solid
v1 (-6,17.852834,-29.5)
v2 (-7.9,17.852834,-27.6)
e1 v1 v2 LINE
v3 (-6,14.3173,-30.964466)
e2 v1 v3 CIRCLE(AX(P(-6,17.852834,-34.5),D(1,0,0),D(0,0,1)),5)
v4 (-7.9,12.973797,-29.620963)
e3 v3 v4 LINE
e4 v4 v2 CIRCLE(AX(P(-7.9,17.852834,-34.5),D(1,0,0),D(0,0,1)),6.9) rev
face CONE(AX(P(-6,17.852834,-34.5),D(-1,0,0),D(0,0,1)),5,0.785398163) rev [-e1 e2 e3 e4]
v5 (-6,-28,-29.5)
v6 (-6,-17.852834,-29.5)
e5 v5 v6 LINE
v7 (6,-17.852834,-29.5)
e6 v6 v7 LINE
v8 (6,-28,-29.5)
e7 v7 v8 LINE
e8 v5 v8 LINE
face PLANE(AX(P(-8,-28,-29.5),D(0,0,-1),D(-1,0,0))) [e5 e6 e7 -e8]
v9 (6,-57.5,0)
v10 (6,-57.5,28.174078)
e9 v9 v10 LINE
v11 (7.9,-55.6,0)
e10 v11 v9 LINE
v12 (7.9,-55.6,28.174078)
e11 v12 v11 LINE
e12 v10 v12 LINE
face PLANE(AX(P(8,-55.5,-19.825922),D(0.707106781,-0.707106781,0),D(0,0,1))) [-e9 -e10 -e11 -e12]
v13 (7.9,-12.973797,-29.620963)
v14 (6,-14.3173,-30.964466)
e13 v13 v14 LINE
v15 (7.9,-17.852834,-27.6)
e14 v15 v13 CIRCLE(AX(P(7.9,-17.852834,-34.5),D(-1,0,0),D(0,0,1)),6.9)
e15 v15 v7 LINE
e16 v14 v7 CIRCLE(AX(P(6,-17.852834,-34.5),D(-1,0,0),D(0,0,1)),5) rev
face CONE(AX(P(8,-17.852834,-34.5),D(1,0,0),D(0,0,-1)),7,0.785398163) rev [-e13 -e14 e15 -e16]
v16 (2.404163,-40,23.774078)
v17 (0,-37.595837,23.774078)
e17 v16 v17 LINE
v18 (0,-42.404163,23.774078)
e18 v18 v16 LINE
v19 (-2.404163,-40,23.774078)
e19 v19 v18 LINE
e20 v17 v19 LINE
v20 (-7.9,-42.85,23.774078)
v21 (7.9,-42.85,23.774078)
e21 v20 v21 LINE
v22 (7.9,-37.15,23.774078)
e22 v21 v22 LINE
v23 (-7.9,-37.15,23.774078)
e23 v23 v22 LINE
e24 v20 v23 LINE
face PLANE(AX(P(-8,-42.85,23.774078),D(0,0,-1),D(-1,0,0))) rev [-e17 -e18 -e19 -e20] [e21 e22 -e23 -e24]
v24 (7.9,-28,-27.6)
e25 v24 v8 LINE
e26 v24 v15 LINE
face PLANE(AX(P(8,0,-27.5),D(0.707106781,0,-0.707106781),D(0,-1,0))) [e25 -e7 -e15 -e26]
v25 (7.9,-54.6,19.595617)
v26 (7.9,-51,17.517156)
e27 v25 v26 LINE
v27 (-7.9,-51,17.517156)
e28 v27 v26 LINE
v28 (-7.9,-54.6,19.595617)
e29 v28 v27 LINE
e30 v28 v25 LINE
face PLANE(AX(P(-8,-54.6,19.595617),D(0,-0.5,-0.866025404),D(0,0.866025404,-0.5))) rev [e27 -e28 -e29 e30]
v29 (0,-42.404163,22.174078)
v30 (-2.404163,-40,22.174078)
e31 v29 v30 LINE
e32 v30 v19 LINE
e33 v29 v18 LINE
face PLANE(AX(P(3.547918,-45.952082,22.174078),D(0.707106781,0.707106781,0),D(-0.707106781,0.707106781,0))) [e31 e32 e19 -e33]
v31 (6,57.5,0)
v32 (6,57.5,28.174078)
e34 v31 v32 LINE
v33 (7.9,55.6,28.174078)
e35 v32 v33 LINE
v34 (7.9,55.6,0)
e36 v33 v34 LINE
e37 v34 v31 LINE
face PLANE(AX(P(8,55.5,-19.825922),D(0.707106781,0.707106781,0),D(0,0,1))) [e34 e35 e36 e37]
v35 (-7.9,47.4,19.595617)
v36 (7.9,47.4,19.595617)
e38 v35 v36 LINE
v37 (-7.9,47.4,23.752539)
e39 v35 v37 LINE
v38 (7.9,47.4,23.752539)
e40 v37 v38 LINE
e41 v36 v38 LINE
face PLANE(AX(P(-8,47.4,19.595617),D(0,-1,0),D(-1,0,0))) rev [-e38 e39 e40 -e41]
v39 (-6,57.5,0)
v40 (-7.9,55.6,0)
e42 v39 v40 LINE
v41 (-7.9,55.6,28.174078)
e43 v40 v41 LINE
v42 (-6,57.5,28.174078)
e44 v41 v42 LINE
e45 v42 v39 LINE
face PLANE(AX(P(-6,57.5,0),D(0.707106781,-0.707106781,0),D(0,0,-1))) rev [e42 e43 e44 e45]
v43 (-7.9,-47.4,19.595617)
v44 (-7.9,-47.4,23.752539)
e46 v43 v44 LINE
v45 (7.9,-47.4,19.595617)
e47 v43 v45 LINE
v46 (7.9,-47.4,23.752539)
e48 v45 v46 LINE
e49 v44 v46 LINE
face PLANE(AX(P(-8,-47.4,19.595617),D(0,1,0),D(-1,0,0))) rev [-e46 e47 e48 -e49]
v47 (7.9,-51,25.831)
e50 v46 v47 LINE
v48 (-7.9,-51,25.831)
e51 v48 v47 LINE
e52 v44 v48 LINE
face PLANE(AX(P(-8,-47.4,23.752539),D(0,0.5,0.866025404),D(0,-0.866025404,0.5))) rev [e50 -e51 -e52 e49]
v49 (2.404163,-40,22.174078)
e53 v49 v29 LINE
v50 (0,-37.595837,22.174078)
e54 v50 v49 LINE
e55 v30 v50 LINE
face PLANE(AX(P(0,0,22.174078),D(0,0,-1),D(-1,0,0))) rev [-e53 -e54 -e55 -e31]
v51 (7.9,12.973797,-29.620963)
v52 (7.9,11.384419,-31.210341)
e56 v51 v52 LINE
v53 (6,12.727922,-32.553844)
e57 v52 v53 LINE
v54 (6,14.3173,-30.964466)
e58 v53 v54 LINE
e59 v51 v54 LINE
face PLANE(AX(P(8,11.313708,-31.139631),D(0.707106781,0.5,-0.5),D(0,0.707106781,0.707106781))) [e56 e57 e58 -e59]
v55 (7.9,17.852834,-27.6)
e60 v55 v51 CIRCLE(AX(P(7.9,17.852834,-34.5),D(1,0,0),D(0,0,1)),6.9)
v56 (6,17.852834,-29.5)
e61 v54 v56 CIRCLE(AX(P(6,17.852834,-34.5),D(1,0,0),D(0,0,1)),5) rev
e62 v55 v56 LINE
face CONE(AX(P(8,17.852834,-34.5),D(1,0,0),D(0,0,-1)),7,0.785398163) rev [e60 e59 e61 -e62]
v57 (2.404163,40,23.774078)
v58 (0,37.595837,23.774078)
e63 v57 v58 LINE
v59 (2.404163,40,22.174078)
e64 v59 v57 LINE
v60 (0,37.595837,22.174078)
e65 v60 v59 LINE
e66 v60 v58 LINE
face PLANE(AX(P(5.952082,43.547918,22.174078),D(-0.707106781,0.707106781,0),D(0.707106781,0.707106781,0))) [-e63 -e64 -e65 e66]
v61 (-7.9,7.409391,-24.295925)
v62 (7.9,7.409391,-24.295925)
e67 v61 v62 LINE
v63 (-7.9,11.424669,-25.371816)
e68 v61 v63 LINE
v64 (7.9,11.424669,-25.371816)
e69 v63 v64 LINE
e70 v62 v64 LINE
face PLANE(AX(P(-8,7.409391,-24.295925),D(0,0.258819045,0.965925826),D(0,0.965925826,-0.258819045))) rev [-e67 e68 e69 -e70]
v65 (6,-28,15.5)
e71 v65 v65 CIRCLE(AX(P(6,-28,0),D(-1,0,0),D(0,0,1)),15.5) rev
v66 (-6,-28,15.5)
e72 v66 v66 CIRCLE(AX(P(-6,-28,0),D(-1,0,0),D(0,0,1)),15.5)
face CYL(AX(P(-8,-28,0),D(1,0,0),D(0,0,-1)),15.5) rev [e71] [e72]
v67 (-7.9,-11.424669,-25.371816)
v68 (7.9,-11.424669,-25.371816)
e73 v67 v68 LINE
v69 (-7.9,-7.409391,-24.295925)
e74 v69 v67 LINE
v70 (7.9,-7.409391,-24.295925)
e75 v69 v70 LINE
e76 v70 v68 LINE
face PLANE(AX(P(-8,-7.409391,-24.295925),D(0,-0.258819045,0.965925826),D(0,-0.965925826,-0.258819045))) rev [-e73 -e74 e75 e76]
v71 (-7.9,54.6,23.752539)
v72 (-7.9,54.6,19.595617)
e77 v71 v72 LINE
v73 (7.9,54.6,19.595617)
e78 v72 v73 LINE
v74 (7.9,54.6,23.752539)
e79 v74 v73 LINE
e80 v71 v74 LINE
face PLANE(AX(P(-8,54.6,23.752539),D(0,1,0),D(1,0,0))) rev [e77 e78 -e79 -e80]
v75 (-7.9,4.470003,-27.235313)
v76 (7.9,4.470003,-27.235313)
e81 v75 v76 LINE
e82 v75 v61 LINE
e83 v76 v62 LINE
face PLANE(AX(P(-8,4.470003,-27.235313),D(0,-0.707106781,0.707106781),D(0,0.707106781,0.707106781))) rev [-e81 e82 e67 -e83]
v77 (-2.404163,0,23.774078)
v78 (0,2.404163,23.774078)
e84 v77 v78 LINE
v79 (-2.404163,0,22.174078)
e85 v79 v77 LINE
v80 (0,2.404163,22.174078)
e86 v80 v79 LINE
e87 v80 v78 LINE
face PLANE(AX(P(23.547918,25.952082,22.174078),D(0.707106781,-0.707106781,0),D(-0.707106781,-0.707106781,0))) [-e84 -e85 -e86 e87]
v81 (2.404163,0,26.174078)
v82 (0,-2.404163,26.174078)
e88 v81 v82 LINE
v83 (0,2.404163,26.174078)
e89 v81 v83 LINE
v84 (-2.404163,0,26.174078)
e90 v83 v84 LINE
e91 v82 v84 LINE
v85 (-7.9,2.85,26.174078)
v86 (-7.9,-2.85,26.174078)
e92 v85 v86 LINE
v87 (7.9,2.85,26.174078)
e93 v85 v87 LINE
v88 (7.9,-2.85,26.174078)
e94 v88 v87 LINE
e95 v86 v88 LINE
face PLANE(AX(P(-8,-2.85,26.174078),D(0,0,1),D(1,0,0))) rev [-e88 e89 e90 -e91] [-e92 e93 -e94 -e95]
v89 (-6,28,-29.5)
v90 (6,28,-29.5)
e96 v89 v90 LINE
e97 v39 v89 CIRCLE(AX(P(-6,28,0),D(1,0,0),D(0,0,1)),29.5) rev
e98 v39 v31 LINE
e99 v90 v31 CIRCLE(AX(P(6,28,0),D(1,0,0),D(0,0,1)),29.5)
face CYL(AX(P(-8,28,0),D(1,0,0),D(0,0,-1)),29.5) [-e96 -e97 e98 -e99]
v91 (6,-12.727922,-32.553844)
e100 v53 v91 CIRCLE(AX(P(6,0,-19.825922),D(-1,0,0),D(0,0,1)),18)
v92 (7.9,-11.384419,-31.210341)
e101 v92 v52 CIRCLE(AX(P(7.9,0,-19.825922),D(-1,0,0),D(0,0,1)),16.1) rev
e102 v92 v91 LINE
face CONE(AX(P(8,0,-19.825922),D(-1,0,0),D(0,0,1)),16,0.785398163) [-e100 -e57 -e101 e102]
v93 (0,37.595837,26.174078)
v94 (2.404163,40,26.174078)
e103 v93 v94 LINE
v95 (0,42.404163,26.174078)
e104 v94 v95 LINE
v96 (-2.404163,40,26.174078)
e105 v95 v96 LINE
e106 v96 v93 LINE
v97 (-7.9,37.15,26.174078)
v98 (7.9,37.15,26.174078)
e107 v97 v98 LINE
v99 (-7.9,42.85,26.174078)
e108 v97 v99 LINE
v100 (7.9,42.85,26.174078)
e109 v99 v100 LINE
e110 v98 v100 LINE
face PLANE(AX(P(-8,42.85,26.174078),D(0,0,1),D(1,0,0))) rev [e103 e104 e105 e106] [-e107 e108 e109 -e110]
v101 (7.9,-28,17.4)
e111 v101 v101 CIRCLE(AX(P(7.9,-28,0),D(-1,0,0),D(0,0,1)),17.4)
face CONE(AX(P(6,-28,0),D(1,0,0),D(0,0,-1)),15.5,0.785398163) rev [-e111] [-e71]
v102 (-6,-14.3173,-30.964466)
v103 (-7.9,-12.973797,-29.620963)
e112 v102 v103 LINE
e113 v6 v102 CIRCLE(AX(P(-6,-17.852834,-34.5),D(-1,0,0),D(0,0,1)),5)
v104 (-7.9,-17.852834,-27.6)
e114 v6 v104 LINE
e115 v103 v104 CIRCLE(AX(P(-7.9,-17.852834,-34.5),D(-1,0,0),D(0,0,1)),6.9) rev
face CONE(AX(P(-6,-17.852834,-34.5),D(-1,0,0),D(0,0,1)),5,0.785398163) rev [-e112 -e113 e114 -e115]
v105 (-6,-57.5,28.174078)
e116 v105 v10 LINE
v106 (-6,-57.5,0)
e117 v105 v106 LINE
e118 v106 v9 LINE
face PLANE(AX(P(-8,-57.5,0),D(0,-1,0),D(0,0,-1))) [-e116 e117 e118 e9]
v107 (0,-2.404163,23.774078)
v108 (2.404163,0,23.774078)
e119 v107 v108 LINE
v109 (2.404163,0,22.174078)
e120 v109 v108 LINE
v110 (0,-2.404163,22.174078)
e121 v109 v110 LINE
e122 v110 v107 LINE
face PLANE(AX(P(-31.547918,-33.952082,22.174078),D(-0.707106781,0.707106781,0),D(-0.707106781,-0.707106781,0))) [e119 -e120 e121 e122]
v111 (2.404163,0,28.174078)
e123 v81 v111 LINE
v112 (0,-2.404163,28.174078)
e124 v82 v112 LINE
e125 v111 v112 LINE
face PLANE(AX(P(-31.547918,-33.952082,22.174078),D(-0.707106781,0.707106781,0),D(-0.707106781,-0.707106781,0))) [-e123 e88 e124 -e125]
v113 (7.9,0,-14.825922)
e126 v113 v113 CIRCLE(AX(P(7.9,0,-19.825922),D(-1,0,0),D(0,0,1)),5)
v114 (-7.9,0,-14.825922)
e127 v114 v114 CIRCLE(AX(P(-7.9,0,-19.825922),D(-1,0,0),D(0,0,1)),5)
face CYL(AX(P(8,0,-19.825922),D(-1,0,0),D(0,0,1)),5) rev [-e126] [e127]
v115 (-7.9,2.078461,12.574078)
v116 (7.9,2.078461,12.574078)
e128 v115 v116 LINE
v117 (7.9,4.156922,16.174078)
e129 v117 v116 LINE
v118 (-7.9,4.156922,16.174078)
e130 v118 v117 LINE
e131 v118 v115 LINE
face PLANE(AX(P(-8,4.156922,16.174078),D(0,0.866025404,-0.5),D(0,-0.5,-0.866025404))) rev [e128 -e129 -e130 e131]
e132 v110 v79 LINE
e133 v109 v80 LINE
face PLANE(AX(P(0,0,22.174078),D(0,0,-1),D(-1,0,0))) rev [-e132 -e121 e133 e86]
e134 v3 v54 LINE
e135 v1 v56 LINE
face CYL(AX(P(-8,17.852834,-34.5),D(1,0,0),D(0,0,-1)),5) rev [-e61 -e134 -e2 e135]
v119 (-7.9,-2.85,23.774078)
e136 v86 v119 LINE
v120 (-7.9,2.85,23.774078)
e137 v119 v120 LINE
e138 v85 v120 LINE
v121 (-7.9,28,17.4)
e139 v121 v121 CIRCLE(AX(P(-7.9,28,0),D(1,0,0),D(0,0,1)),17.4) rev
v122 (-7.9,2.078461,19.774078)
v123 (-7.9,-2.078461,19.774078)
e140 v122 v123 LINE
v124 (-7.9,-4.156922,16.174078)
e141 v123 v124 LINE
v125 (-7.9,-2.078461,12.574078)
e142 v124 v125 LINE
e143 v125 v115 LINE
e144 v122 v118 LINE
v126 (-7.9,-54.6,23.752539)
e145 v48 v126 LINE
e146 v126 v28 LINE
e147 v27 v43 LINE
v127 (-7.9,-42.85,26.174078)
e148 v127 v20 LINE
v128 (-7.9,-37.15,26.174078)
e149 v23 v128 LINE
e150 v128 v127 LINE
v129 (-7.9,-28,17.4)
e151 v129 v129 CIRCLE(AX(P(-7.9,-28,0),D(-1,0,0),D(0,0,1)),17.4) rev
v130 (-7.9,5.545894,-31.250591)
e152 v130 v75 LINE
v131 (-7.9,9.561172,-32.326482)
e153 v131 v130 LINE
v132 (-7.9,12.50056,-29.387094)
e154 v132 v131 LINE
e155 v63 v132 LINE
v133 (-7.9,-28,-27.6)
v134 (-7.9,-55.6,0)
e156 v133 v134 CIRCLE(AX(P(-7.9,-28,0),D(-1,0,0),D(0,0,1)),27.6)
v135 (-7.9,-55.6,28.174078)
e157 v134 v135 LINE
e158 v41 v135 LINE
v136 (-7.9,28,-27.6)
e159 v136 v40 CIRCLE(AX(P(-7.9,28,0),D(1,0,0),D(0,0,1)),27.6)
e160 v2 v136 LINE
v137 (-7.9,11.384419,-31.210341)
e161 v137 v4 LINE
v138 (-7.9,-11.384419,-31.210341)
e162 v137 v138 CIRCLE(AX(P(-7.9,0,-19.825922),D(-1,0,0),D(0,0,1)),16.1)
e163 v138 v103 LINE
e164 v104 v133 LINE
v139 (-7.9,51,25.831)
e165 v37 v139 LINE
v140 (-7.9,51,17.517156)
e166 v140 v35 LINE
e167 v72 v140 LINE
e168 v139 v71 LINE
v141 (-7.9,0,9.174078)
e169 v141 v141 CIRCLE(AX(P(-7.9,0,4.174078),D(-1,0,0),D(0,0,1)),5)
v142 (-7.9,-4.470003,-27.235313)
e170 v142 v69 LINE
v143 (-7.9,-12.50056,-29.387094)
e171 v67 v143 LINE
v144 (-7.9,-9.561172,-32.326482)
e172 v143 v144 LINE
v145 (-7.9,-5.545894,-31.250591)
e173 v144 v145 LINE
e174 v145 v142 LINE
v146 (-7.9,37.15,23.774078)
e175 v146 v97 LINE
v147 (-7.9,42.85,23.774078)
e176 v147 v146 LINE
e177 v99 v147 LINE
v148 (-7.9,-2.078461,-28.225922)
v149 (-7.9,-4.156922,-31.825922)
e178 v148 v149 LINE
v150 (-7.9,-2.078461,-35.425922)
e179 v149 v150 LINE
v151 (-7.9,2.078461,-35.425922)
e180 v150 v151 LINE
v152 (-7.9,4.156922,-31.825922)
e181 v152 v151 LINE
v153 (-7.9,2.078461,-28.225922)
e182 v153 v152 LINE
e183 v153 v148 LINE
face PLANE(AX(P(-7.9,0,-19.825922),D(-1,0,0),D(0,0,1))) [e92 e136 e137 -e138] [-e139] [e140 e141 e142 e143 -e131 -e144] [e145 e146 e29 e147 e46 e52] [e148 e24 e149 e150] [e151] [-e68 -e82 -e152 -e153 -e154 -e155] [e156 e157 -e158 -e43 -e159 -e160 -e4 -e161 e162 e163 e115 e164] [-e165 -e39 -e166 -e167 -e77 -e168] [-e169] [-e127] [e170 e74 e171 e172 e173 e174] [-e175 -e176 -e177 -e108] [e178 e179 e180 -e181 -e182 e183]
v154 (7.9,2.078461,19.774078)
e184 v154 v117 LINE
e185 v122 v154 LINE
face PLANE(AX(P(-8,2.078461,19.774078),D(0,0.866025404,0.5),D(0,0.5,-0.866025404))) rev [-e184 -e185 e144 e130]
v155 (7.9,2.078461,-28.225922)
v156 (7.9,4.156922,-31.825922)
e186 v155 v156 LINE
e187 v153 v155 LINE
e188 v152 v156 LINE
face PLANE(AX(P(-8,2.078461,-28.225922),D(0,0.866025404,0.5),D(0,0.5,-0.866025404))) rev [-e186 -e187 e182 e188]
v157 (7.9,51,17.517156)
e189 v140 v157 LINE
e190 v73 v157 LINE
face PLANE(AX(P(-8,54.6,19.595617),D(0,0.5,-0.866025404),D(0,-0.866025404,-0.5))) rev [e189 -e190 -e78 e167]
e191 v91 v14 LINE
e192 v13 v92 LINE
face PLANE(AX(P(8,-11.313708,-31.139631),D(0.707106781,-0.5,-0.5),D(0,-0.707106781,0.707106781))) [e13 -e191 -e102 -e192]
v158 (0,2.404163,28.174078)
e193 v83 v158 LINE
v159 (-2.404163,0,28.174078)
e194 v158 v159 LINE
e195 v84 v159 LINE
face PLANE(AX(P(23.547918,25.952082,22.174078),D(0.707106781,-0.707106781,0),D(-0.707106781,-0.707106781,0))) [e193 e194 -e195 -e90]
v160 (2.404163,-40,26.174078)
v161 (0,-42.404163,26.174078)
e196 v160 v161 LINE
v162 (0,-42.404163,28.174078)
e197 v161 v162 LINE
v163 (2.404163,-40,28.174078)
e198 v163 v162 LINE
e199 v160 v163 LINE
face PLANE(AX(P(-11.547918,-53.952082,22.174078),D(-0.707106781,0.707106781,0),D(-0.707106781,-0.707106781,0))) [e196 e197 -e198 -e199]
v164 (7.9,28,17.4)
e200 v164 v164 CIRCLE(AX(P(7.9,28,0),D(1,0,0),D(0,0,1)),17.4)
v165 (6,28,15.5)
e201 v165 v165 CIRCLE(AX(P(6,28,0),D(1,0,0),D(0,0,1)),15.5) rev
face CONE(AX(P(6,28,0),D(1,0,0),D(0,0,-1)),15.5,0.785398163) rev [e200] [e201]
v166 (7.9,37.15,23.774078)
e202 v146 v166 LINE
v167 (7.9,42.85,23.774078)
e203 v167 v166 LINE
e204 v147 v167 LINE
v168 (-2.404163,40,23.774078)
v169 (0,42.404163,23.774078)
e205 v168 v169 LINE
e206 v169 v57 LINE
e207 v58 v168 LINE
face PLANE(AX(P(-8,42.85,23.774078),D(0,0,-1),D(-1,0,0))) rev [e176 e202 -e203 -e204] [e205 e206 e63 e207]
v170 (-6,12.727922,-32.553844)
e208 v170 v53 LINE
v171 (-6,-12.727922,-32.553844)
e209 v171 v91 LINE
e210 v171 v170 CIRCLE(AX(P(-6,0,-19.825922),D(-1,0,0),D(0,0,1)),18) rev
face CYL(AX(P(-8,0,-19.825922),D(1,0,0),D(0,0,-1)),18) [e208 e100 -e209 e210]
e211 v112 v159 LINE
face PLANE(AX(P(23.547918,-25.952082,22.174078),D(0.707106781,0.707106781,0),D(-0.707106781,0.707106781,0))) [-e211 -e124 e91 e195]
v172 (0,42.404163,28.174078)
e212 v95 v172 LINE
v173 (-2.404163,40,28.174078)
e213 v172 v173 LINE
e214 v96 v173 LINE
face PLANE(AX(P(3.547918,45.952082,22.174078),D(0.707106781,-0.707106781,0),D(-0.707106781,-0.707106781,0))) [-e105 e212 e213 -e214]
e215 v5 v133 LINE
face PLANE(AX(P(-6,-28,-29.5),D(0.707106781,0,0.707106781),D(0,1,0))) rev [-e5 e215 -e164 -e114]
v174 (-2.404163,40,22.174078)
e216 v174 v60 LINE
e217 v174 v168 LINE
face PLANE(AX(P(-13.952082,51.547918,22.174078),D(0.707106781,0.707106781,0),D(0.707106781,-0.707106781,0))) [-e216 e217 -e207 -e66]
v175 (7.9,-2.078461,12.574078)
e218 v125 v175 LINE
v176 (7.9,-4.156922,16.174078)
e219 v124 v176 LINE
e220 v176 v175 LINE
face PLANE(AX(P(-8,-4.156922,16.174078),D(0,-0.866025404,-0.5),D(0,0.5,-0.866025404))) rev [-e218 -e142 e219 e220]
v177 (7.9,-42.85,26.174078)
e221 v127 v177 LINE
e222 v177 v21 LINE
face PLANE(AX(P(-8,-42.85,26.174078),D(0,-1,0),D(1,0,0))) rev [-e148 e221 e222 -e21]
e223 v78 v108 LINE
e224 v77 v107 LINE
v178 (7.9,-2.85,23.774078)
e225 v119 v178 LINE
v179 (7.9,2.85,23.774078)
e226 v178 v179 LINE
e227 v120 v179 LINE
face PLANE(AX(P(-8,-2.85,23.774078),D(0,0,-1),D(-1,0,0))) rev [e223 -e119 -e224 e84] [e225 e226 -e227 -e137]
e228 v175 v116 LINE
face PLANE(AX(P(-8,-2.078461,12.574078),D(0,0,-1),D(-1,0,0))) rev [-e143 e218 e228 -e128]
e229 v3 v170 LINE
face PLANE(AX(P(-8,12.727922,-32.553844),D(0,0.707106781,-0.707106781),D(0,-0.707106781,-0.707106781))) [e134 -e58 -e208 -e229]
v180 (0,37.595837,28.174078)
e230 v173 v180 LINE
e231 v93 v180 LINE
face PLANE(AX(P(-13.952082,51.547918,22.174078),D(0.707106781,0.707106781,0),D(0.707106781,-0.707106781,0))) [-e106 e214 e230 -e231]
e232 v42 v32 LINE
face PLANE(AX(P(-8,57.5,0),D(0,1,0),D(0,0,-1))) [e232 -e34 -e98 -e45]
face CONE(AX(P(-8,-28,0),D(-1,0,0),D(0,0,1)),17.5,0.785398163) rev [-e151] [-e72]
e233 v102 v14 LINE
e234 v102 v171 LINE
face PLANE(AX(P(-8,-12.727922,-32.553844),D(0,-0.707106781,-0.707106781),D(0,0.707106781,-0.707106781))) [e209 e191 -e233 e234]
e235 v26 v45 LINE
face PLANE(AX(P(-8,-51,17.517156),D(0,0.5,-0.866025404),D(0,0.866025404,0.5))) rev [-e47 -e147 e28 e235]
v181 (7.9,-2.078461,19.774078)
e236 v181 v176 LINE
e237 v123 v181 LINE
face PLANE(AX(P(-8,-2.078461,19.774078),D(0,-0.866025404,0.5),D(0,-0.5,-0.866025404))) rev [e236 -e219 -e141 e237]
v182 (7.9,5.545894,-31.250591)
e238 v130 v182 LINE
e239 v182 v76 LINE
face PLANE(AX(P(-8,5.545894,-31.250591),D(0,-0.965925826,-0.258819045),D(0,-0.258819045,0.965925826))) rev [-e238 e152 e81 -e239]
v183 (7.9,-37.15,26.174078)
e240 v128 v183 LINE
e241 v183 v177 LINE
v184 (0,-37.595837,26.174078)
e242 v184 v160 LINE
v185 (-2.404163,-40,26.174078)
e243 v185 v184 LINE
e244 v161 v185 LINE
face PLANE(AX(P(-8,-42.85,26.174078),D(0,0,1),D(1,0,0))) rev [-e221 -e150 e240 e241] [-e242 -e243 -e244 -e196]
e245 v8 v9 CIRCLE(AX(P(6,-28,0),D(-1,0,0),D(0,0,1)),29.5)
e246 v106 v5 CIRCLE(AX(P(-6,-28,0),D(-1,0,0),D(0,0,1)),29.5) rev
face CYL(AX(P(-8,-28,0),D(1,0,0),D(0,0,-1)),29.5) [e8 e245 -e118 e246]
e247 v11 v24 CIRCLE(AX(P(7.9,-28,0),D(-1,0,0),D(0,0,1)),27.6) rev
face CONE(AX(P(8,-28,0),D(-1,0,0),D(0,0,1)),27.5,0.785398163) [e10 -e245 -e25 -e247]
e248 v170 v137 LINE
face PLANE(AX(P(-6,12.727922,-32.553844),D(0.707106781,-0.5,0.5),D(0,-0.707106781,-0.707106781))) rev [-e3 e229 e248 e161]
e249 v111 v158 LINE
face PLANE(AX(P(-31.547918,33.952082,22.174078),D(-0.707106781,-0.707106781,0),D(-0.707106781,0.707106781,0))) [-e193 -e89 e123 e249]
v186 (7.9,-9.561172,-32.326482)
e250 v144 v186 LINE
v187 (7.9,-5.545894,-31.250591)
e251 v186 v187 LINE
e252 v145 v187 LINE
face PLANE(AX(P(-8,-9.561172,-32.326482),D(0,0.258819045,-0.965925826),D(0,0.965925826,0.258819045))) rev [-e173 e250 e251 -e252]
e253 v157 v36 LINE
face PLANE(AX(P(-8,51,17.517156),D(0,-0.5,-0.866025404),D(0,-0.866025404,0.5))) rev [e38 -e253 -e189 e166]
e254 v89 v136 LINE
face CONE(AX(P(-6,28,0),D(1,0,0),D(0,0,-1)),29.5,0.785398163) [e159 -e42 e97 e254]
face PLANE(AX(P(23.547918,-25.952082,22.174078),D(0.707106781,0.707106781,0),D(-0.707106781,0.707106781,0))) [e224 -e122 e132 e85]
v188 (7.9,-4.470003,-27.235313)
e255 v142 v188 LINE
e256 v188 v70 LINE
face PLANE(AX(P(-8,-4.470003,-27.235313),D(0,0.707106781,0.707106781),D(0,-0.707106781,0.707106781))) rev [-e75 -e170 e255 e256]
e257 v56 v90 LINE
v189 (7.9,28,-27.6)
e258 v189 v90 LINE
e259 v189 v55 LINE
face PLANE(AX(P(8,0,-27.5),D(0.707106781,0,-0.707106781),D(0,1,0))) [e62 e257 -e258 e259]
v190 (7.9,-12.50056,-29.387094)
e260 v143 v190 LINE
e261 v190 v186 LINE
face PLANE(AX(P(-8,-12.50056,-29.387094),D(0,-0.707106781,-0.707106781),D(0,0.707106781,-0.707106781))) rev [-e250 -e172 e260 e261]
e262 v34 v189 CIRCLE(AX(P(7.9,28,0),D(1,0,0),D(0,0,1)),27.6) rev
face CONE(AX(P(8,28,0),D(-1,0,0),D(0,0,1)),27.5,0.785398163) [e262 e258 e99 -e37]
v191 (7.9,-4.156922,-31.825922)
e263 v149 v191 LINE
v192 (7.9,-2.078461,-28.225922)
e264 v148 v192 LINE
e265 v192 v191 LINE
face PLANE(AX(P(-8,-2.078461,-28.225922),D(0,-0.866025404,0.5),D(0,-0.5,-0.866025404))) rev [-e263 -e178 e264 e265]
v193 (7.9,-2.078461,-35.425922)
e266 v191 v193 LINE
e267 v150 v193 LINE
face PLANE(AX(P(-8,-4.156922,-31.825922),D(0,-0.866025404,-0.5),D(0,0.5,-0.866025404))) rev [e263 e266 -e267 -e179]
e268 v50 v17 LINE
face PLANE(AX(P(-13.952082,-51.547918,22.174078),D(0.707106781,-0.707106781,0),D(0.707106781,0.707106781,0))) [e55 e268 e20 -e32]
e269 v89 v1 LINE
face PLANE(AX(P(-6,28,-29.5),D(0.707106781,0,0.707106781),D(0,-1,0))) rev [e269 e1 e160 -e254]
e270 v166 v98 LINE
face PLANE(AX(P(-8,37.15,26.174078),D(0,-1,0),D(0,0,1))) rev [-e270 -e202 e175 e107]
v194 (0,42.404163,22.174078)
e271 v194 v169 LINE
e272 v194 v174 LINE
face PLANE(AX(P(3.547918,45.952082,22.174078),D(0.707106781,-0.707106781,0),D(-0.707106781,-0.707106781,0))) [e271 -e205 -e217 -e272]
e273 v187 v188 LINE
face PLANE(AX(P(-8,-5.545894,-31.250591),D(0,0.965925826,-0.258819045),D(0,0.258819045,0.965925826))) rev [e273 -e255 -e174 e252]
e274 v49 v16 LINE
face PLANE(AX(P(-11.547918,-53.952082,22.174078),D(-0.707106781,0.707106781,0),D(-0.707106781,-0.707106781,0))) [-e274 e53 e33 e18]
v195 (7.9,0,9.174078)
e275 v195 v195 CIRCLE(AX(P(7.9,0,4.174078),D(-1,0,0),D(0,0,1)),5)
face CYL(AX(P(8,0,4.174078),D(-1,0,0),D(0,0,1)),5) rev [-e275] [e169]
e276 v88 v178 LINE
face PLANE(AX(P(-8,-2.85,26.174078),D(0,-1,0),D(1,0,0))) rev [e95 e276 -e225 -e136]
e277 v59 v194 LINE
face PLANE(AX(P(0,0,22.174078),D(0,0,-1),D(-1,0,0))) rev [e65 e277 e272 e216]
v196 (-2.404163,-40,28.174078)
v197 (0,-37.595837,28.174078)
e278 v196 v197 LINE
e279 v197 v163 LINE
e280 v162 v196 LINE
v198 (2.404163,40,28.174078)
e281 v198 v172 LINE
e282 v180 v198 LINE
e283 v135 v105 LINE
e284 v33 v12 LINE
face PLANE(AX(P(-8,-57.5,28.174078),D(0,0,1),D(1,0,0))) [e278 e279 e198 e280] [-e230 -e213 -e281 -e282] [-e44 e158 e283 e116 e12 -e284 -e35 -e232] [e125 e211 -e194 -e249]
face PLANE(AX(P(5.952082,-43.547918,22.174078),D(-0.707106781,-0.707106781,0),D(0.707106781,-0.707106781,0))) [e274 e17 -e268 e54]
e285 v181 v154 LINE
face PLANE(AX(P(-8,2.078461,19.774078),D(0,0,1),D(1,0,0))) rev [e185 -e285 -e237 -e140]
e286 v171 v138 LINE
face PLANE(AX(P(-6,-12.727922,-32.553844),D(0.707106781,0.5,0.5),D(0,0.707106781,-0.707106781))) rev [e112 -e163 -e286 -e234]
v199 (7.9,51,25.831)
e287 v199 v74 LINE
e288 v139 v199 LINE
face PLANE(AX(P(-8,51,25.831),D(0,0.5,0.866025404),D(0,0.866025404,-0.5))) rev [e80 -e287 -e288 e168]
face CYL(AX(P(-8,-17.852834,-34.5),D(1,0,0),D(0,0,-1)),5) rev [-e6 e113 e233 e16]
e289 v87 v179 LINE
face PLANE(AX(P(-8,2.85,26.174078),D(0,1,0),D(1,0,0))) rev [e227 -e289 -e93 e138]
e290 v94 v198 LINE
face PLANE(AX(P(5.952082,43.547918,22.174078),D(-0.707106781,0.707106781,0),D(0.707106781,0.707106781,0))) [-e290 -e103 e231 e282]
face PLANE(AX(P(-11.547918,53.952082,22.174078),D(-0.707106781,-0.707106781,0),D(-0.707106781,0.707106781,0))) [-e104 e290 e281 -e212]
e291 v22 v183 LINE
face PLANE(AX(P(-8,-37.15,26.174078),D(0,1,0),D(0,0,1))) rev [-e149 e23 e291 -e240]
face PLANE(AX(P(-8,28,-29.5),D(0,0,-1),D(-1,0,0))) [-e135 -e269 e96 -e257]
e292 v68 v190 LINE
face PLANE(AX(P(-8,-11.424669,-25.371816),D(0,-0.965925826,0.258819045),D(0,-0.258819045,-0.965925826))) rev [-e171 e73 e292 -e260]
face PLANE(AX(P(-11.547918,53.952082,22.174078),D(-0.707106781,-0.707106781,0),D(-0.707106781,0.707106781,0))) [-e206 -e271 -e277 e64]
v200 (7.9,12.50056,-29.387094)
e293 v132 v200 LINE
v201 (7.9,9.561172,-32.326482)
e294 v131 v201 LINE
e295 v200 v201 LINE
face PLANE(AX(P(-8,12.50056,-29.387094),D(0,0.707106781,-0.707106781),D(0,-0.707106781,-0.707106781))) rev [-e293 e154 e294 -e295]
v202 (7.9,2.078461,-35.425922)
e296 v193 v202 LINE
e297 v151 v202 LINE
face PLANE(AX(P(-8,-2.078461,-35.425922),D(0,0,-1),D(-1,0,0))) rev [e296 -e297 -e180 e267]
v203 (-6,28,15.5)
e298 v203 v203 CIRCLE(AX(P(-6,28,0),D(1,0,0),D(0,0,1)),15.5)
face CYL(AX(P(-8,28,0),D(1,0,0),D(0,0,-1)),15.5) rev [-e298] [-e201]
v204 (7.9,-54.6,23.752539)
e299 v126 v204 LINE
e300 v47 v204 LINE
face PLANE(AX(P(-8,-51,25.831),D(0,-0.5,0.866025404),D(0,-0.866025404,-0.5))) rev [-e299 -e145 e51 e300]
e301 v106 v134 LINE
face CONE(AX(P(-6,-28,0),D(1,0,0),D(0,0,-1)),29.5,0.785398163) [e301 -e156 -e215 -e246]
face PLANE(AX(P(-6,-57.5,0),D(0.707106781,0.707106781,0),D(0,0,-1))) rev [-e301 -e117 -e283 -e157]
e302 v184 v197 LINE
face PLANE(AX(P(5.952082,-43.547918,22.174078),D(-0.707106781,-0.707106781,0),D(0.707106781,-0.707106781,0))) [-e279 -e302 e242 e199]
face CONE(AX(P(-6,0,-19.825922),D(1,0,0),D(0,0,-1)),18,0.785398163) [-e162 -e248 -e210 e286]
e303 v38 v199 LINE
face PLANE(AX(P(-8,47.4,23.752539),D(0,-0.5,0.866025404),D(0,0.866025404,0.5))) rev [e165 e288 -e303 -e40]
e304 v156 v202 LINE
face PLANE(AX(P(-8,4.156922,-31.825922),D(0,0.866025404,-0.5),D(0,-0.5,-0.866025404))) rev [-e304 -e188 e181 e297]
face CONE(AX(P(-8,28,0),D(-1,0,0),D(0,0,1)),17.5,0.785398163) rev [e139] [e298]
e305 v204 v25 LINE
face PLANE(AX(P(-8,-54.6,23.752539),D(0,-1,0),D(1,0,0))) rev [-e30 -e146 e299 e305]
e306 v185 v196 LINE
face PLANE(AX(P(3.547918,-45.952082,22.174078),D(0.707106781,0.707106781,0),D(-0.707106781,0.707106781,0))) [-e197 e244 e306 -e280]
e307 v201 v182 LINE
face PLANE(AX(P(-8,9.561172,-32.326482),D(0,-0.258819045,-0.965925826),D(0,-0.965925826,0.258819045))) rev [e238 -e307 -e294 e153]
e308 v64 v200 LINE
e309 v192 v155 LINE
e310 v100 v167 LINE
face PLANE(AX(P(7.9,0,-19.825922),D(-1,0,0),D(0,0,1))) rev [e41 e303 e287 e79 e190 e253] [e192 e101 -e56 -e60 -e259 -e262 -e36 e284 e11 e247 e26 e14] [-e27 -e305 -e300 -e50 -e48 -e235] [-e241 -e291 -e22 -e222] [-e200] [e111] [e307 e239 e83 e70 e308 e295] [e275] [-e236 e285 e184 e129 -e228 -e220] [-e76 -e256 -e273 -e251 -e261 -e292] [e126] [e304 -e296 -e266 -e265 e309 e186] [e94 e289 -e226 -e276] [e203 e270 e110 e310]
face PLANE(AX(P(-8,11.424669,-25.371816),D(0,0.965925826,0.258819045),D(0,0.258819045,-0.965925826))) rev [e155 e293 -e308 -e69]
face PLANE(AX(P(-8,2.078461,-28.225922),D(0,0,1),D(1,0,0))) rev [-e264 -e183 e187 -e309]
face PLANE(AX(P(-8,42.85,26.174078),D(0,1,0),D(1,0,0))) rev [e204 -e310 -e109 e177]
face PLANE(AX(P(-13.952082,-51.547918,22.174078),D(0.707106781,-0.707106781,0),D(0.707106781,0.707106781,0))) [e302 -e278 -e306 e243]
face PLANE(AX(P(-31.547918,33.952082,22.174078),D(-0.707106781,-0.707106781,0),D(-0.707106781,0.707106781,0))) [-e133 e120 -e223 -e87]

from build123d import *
from build123d.topology import SkipClean

# Parameters (mm, degrees)
BOSS_EXTRUDE1_DEPTH     = 8
CUT_EXTRUDE1_DEPTH      = 78.289612463
CUT_EXTRUDE1_DEPTH_BACK = 70.289612463
CUT_EXTRUDE1_START      = -8
SKETCH9_R               = 5
CUT_EXTRUDE2_DEPTH      = 70.289612463
CUT_EXTRUDE2_DEPTH_BACK = 70.289612463
CUT_EXTRUDE3_DEPTH      = 70.289612463
CUT_EXTRUDE3_DEPTH_BACK = 70.289612463
SKETCH11_R              = 15.5
CUT_EXTRUDE4_DEPTH      = 70.289612463
CUT_EXTRUDE4_DEPTH_BACK = 70.289612463
SKETCH12_W              = 5.7
SKETCH12_H              = 2.4
CUT_EXTRUDE5_START      = 28.174078
CUT_EXTRUDE5_DEPTH      = 6
CHAMFER1_SIZE           = 2
MOVE_START              = -8
MOVE_FACE1_OUTLINE_W    = 59
MOVE_FACE1_OUTLINE_H    = 67
MOVE_FACE1_DEPTH        = 0.1
MOVE_START_2            = 7.9
MOVE_FACE1_2_OUTLINE_W  = 59
MOVE_FACE1_2_OUTLINE_H  = 67
MOVE_FACE1_2_DEPTH      = 0.1


# Read off the part's stored shape, not the designer's step: Move Face1
with BuildPart() as part:
    # Sketch2 → Boss-Extrude1 (new, symmetric)
    with BuildSketch(Plane.YZ):
        with BuildLine():
            Line((-12.727922061, -32.553844327), (-14.317300295, -30.964466094))
            ThreePointArc((-14.317300295, -30.964466094), (-15.939417039, -29.880602337), (-17.852834201, -29.5))
            Line((-17.852834201, -29.5), (-28, -29.5))
            ThreePointArc((-28, -29.5), (-48.859650045, -20.859650045), (-57.5, 0))
            Line((-57.5, 0), (-57.5, 28.174077734))
            Line((-57.5, 28.174077734), (0, 28.174077734))
            Line((0, 28.174077734), (0, -37.825922266))
            ThreePointArc((0, -37.825922266), (-6.888301783, -36.455753851), (-12.727922061, -32.553844327))
        make_face()
    extrude(amount=BOSS_EXTRUDE1_DEPTH, both=True)

    # Sketch9 → Cut-Extrude1 (cut, two sides: drawn at the far end of the back side and taken through both)
    with BuildSketch(Plane.YZ.offset(CUT_EXTRUDE1_START - CUT_EXTRUDE1_DEPTH_BACK)):
        with Locations((0, 4.174077734)):
            Circle(SKETCH9_R)
        with Locations((0, -19.825922266)):
            Circle(SKETCH9_R)
    extrude(amount=CUT_EXTRUDE1_DEPTH + CUT_EXTRUDE1_DEPTH_BACK, mode=Mode.SUBTRACT)

    # Sketch10 → Cut-Extrude2 (cut, two sides: drawn at the far end of the back side and taken through both)
    with BuildSketch(Plane.YZ.offset(-CUT_EXTRUDE2_DEPTH_BACK)):
        Polygon((2.078460969, 12.574077734), (4.156921938, 16.174077734), (2.078460969, 19.774077734), (-2.078460969, 19.774077734), (-4.156921938, 16.174077734), (-2.078460969, 12.574077734), align=None)
        Polygon((-5.545893683, -31.250591332), (-4.470003116, -27.235313074), (-7.409390808, -24.295925382), (-11.424669066, -25.371815949), (-12.500559632, -29.387094207), (-9.561171941, -32.326481898), align=None)
        Polygon((4.156921938, -31.825922266), (2.078460969, -28.225922266), (-2.078460969, -28.225922266), (-4.156921938, -31.825922266), (-2.078460969, -35.425922266), (2.078460969, -35.425922266), align=None)
        Polygon((12.500559632, -29.387094207), (11.424669066, -25.371815949), (7.409390808, -24.295925382), (4.470003116, -27.235313074), (5.545893683, -31.250591332), (9.561171941, -32.326481898), align=None)
        Polygon((-51, 17.517155796), (-47.4, 19.595616765), (-47.4, 23.752538703), (-51, 25.830999672), (-54.6, 23.752538703), (-54.6, 19.595616765), align=None)
    extrude(amount=CUT_EXTRUDE2_DEPTH + CUT_EXTRUDE2_DEPTH_BACK, mode=Mode.SUBTRACT)

    # Sketch11 → Cut-Extrude3 (cut, two sides: drawn at the far end of the back side and taken through both)
    with BuildSketch(Plane.YZ.offset(-CUT_EXTRUDE3_DEPTH_BACK)):
        with Locations(Location((-28, 0, 0), (0, 0, 270))):
            Circle(SKETCH11_R)
    extrude(amount=CUT_EXTRUDE3_DEPTH + CUT_EXTRUDE3_DEPTH_BACK, mode=Mode.SUBTRACT)

    # Sketch12 → Cut-Extrude4 (cut, two sides: drawn at the far end of the back side and taken through both)
    with BuildSketch(Plane.YZ.offset(-CUT_EXTRUDE4_DEPTH_BACK)):
        with Locations((-40, 24.974077734)):
            Rectangle(SKETCH12_W, SKETCH12_H)
        with Locations((0, 24.974077734)):
            Rectangle(SKETCH12_W, SKETCH12_H)
    extrude(amount=CUT_EXTRUDE4_DEPTH + CUT_EXTRUDE4_DEPTH_BACK, mode=Mode.SUBTRACT)

    # Sketch13 → Cut-Extrude5 (cut)
    with BuildSketch(Plane.XY.offset(CUT_EXTRUDE5_START)):
        Polygon((0, -2.404163056), (2.404163056, 0), (0, 2.404163056), (-2.404163056, 0), align=None)
        Polygon((0, -42.404163056), (2.404163056, -40), (0, -37.595836944), (-2.404163056, -40), align=None)
    extrude(amount=-CUT_EXTRUDE5_DEPTH, mode=Mode.SUBTRACT)

    # Chamfer1
    chamfer1_edges = [part.edges().sort_by_distance(p)[0] for p in [
        (8, -22.9264171, -29.5),
        (8, -48.859650045, -20.859650045),
        (8, -57.5, 14.087038867),
        (-8, -48.859650045, -20.859650045),
        (-8, -28, 15.5),
        (8, -28, 15.5),
        (-8, -22.9264171, -29.5),
        (-8, -15.939417039, -29.880602337),
        (-8, -13.522611178, -31.759155211),
        (-8, -6.888301783, -36.455753851),
        (-8, -57.5, 14.087038867),
        (8, -6.888301783, -36.455753851),
        (8, -13.522611178, -31.759155211),
        (8, -15.939417039, -29.880602337),
    ]]
    chamfer(chamfer1_edges, length=CHAMFER1_SIZE)

    # Move Face1 outline → Move Face1 (cut)
    with BuildSketch(Plane.YZ.offset(MOVE_START)):
        with Locations((-27.5, -3.5)):
            Rectangle(MOVE_FACE1_OUTLINE_W, MOVE_FACE1_OUTLINE_H)
    extrude(amount=MOVE_FACE1_DEPTH, mode=Mode.SUBTRACT)

    # Move Face1 2 outline → Move Face1 2 (cut)
    with BuildSketch(Plane.YZ.offset(MOVE_START_2)):
        with Locations((-27.5, -3.5)):
            Rectangle(MOVE_FACE1_2_OUTLINE_W, MOVE_FACE1_2_OUTLINE_H)
    extrude(amount=MOVE_FACE1_2_DEPTH, mode=Mode.SUBTRACT)

    # Mirror1: part across plane


with BuildPart() as part_1:
    with SkipClean():  # the faces are left unmerged after this step: merging them gives an invalid solid
        add(part.part)
        add(part.part.mirror(Plane(origin=(0, 0, 0), x_dir=(0, 0, 1), z_dir=(0, -1, 0))))


solid = part_1.part
